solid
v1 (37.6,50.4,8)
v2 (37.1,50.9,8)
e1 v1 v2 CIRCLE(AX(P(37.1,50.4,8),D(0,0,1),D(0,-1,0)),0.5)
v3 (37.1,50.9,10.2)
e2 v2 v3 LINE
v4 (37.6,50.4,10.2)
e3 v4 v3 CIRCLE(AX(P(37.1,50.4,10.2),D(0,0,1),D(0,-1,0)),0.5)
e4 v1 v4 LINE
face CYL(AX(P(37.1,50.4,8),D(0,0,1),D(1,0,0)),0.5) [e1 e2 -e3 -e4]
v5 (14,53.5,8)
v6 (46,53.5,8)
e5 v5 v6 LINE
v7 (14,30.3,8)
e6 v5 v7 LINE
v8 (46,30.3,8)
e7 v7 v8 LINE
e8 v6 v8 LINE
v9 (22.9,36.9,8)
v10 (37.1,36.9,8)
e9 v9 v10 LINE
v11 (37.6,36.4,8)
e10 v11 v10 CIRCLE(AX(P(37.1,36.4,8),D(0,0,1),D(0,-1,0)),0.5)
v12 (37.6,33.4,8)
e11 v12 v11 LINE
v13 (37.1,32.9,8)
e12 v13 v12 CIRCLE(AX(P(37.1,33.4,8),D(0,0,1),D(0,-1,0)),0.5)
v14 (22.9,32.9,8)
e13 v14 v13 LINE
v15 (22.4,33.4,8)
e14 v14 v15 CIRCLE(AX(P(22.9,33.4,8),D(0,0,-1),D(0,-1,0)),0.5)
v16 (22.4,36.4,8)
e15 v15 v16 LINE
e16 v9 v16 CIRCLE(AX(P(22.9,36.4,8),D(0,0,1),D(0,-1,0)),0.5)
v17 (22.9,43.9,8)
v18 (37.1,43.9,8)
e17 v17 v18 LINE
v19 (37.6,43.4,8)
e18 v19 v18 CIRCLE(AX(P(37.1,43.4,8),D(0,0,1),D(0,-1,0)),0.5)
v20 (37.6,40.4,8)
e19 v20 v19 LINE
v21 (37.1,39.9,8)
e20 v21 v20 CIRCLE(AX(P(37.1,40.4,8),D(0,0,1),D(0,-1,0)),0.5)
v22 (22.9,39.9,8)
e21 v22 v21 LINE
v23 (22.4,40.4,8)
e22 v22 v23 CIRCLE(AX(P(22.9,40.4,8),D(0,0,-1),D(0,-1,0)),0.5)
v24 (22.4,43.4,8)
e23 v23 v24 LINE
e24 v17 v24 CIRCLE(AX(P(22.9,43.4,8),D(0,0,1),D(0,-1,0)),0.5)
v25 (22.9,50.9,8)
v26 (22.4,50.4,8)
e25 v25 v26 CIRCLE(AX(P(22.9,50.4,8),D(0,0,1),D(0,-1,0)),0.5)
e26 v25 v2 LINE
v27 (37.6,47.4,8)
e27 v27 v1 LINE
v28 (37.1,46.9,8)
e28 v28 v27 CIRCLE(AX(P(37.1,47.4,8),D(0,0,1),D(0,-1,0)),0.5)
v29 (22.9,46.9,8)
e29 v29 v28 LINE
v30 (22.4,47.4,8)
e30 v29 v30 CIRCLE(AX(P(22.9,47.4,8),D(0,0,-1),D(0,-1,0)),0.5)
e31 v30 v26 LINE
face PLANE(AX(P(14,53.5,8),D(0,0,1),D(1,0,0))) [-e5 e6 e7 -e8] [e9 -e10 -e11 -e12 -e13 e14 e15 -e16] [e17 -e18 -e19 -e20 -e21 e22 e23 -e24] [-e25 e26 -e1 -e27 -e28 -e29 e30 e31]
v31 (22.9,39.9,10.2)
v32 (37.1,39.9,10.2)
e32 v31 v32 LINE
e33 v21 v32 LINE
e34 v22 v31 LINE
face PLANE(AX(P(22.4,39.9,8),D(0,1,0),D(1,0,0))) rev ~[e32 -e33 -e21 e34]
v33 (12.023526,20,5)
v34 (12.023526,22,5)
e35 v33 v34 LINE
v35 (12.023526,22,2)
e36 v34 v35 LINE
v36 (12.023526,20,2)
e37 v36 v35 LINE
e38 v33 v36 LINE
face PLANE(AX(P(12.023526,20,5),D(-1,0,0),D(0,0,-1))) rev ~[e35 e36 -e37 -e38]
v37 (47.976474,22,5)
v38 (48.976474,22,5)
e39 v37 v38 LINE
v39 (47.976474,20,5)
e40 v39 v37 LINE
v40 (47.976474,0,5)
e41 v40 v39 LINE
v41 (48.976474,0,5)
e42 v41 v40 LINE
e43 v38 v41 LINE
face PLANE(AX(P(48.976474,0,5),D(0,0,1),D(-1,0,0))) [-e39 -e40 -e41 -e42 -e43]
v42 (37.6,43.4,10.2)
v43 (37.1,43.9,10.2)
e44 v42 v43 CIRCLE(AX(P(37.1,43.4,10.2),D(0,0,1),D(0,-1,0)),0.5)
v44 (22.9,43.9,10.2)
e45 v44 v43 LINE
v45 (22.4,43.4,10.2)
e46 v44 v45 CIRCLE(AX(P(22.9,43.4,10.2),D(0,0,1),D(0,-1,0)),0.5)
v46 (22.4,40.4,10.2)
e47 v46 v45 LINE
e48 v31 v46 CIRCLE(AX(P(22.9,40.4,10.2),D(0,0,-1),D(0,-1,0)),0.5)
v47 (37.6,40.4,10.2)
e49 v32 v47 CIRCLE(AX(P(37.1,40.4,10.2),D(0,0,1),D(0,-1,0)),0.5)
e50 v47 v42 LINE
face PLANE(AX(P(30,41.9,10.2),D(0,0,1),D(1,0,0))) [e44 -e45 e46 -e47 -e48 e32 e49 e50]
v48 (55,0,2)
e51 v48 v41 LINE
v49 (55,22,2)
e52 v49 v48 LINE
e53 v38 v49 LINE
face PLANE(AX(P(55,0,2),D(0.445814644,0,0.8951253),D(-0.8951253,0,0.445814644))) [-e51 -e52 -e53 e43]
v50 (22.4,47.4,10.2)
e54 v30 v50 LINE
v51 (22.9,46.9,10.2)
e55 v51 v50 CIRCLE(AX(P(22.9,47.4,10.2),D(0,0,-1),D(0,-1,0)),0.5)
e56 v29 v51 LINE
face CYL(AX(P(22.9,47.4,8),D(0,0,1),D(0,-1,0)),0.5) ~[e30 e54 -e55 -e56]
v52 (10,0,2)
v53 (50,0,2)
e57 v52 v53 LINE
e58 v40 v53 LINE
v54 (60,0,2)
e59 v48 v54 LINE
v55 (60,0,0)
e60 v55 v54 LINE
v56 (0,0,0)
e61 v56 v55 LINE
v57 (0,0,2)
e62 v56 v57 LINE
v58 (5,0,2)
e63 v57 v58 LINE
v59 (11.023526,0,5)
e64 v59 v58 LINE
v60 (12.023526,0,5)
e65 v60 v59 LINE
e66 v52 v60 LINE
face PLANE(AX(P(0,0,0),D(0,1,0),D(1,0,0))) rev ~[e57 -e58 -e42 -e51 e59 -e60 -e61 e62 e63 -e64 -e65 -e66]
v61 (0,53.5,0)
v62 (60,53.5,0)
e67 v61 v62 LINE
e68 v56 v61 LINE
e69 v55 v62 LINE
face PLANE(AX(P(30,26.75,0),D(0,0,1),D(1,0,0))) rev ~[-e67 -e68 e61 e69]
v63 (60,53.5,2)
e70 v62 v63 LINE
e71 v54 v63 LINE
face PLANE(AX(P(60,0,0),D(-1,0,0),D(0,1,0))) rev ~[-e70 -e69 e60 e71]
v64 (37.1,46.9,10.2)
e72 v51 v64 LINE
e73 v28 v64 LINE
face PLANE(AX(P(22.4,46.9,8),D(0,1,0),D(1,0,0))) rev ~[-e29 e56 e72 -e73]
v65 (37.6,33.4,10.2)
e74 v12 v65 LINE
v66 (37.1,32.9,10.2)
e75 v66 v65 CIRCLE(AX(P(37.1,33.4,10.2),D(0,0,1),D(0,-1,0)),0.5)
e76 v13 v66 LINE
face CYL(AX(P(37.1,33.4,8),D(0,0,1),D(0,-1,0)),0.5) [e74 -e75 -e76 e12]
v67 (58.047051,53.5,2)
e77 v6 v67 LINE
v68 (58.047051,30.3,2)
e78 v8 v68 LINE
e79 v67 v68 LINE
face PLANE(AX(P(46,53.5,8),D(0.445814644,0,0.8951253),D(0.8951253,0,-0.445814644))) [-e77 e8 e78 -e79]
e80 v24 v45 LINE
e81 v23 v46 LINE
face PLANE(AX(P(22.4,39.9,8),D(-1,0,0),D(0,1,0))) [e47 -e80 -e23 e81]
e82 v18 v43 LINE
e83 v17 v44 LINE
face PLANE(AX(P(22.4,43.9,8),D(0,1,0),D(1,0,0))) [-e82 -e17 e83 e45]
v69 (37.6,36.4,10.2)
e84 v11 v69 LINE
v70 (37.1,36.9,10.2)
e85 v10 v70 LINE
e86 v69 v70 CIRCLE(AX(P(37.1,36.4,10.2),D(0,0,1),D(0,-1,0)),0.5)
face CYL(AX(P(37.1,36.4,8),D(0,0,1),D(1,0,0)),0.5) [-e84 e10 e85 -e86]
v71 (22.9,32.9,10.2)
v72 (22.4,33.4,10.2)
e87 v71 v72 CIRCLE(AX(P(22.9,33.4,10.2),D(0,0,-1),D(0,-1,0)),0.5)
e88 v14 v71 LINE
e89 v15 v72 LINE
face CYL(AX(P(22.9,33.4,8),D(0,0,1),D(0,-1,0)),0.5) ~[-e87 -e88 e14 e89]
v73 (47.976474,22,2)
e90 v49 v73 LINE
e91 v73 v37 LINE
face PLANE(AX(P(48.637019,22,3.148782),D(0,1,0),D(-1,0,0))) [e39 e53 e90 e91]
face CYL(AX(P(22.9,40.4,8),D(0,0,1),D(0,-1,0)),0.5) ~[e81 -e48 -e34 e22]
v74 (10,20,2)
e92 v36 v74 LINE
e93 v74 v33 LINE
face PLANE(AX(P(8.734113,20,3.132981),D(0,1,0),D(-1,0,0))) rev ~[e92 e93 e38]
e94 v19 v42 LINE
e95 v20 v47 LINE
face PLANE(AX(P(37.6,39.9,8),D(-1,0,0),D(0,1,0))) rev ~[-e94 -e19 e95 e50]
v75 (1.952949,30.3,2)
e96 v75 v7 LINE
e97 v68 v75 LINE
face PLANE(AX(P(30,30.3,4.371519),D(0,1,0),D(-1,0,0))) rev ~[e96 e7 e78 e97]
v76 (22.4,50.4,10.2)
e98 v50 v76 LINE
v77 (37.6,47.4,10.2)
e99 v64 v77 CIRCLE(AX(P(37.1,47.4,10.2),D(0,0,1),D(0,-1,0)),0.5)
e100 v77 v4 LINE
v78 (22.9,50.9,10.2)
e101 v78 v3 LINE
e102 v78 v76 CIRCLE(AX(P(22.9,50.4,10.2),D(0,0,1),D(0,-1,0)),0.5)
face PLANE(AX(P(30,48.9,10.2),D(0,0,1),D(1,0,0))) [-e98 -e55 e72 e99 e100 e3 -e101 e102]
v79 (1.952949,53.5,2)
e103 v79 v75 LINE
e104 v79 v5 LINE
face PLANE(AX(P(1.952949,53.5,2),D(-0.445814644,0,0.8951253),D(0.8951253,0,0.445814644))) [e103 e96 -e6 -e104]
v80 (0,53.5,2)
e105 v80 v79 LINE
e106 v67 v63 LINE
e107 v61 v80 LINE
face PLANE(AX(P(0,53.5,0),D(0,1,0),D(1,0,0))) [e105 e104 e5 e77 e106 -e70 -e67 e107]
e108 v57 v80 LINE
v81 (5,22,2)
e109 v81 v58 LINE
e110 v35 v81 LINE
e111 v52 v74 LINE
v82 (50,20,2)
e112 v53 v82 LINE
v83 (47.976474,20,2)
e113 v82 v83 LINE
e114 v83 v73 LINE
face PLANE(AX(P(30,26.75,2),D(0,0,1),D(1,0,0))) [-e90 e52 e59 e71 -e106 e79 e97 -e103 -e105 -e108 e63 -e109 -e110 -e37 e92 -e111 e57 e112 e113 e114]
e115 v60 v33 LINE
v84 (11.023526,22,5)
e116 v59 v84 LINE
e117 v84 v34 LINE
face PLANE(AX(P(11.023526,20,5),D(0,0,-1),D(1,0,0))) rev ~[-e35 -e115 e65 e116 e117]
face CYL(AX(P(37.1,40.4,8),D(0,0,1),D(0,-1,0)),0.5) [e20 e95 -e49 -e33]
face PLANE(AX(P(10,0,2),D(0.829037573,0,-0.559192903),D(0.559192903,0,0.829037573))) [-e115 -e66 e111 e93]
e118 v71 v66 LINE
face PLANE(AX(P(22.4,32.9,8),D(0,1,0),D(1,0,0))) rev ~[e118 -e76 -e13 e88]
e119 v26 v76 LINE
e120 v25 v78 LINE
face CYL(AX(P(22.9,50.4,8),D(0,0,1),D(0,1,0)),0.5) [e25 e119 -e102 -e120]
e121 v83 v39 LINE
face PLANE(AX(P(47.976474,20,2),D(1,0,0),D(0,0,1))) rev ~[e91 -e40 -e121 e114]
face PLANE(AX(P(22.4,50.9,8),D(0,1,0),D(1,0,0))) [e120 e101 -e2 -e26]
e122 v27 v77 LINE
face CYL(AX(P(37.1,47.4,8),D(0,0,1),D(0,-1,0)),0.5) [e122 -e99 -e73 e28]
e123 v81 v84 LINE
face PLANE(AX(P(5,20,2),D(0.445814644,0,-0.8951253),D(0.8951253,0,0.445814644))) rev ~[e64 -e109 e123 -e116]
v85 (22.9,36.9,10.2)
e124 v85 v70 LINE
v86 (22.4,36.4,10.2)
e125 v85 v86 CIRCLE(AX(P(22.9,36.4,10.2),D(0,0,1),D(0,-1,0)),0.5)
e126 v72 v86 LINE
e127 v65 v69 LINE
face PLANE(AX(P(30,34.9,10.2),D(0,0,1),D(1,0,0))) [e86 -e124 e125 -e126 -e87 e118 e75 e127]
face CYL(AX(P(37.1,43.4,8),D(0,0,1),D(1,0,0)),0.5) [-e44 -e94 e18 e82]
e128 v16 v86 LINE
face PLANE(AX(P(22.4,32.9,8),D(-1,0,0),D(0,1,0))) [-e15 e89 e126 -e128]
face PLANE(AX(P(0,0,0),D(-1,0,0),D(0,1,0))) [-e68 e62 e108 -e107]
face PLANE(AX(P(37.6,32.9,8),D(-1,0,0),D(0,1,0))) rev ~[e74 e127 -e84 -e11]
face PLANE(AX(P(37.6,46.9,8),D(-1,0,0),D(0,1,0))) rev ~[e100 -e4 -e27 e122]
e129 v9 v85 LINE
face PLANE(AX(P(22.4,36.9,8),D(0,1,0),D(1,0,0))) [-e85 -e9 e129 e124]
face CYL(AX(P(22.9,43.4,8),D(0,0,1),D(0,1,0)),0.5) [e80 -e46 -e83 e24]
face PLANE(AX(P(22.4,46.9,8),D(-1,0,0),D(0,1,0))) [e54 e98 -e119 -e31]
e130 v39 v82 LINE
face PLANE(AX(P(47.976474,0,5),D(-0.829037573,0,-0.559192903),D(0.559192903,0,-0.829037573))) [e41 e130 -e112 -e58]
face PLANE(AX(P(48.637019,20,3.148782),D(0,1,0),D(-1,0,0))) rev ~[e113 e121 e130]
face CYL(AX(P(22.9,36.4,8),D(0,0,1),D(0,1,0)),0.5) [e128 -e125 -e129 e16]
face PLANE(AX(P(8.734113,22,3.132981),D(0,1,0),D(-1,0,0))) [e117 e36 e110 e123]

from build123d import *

# Parameters (mm, degrees)
F0_W      = 60
F0_H      = 53.5
F1_DEPTH  = 2
F3_DEPTH  = 23.2
F4_W      = 15.2
F4_H      = 4
F5_DEPTH  = 2.2
F6_R      = 0.5
F8_DEPTH  = 20
F11_DEPTH = 2


with BuildPart() as f1:
    # F0 (on Top) → F1 (new body)
    with BuildSketch(Plane.XY):
        with Locations((30, 26.75)):
            Rectangle(F0_W, F0_H)
    extrude(amount=F1_DEPTH)

    # F2 (on face) → F3 (join)
    with BuildSketch(Plane(origin=(0, 53.5, 0), x_dir=(-1, 0, 0), z_dir=(0, 1, 0))):
        Polygon((-1.9529488989, 2), (-14, 8), (-46, 8), (-58.0470511011, 2), align=None)
    extrude(amount=-F3_DEPTH)

    # F4 (on face) → F5 (join)
    with BuildSketch(Plane.XY.offset(8)):
        with Locations((30, 48.9)):
            Rectangle(F4_W, F4_H)
        with Locations((30, 41.9)):
            Rectangle(F4_W, F4_H)
        with Locations((30, 34.9)):
            Rectangle(F4_W, F4_H)
    extrude(amount=F5_DEPTH)

    # F6
    f6_edges = [f1.edges().sort_by_distance(p)[0] for p in [
        (22.4, 46.9, 9.1),
        (22.4, 39.9, 9.1),
        (22.4, 32.9, 9.1),
        (22.4, 36.9, 9.1),
        (22.4, 43.9, 9.1),
        (22.4, 50.9, 9.1),
        (37.6, 32.9, 9.1),
        (37.6, 36.9, 9.1),
        (37.6, 39.9, 9.1),
        (37.6, 43.9, 9.1),
        (37.6, 46.9, 9.1),
        (37.6, 50.9, 9.1),
    ]]
    fillet(f6_edges, radius=F6_R)

    # F7 (on face) → F8 (join)
    with BuildSketch(Plane.XZ):
        Polygon((5, 2), (10, 2), (12.0235255505, 5), (11.0235255505, 5), align=None)
        Polygon((47.9764744495, 5), (50, 2), (55, 2), (48.9764744495, 5), align=None)
    extrude(amount=-F8_DEPTH)

    # F9 (on face) + F10 (on face) → F11 (join)
    with BuildSketch(Plane(origin=(0, 20, 0), x_dir=(-1, 0, 0), z_dir=(0, 1, 0))):
        Polygon((-10, 2), (-5, 2), (-11.0235255505, 5), (-12.0235255505, 5), align=None)
        Polygon((-12.0235255505, 2), (-10, 2), (-12.0235255505, 5), align=None)
    with BuildSketch(Plane(origin=(0, 20, 0), x_dir=(-1, 0, 0), z_dir=(0, 1, 0))):
        Polygon((-47.9764744495, 5), (-50, 2), (-47.9764744495, 2), align=None)
        Polygon((-48.9764744495, 5), (-55, 2), (-50, 2), (-47.9764744495, 5), align=None)
    extrude(amount=F11_DEPTH)


solid = f1.part
